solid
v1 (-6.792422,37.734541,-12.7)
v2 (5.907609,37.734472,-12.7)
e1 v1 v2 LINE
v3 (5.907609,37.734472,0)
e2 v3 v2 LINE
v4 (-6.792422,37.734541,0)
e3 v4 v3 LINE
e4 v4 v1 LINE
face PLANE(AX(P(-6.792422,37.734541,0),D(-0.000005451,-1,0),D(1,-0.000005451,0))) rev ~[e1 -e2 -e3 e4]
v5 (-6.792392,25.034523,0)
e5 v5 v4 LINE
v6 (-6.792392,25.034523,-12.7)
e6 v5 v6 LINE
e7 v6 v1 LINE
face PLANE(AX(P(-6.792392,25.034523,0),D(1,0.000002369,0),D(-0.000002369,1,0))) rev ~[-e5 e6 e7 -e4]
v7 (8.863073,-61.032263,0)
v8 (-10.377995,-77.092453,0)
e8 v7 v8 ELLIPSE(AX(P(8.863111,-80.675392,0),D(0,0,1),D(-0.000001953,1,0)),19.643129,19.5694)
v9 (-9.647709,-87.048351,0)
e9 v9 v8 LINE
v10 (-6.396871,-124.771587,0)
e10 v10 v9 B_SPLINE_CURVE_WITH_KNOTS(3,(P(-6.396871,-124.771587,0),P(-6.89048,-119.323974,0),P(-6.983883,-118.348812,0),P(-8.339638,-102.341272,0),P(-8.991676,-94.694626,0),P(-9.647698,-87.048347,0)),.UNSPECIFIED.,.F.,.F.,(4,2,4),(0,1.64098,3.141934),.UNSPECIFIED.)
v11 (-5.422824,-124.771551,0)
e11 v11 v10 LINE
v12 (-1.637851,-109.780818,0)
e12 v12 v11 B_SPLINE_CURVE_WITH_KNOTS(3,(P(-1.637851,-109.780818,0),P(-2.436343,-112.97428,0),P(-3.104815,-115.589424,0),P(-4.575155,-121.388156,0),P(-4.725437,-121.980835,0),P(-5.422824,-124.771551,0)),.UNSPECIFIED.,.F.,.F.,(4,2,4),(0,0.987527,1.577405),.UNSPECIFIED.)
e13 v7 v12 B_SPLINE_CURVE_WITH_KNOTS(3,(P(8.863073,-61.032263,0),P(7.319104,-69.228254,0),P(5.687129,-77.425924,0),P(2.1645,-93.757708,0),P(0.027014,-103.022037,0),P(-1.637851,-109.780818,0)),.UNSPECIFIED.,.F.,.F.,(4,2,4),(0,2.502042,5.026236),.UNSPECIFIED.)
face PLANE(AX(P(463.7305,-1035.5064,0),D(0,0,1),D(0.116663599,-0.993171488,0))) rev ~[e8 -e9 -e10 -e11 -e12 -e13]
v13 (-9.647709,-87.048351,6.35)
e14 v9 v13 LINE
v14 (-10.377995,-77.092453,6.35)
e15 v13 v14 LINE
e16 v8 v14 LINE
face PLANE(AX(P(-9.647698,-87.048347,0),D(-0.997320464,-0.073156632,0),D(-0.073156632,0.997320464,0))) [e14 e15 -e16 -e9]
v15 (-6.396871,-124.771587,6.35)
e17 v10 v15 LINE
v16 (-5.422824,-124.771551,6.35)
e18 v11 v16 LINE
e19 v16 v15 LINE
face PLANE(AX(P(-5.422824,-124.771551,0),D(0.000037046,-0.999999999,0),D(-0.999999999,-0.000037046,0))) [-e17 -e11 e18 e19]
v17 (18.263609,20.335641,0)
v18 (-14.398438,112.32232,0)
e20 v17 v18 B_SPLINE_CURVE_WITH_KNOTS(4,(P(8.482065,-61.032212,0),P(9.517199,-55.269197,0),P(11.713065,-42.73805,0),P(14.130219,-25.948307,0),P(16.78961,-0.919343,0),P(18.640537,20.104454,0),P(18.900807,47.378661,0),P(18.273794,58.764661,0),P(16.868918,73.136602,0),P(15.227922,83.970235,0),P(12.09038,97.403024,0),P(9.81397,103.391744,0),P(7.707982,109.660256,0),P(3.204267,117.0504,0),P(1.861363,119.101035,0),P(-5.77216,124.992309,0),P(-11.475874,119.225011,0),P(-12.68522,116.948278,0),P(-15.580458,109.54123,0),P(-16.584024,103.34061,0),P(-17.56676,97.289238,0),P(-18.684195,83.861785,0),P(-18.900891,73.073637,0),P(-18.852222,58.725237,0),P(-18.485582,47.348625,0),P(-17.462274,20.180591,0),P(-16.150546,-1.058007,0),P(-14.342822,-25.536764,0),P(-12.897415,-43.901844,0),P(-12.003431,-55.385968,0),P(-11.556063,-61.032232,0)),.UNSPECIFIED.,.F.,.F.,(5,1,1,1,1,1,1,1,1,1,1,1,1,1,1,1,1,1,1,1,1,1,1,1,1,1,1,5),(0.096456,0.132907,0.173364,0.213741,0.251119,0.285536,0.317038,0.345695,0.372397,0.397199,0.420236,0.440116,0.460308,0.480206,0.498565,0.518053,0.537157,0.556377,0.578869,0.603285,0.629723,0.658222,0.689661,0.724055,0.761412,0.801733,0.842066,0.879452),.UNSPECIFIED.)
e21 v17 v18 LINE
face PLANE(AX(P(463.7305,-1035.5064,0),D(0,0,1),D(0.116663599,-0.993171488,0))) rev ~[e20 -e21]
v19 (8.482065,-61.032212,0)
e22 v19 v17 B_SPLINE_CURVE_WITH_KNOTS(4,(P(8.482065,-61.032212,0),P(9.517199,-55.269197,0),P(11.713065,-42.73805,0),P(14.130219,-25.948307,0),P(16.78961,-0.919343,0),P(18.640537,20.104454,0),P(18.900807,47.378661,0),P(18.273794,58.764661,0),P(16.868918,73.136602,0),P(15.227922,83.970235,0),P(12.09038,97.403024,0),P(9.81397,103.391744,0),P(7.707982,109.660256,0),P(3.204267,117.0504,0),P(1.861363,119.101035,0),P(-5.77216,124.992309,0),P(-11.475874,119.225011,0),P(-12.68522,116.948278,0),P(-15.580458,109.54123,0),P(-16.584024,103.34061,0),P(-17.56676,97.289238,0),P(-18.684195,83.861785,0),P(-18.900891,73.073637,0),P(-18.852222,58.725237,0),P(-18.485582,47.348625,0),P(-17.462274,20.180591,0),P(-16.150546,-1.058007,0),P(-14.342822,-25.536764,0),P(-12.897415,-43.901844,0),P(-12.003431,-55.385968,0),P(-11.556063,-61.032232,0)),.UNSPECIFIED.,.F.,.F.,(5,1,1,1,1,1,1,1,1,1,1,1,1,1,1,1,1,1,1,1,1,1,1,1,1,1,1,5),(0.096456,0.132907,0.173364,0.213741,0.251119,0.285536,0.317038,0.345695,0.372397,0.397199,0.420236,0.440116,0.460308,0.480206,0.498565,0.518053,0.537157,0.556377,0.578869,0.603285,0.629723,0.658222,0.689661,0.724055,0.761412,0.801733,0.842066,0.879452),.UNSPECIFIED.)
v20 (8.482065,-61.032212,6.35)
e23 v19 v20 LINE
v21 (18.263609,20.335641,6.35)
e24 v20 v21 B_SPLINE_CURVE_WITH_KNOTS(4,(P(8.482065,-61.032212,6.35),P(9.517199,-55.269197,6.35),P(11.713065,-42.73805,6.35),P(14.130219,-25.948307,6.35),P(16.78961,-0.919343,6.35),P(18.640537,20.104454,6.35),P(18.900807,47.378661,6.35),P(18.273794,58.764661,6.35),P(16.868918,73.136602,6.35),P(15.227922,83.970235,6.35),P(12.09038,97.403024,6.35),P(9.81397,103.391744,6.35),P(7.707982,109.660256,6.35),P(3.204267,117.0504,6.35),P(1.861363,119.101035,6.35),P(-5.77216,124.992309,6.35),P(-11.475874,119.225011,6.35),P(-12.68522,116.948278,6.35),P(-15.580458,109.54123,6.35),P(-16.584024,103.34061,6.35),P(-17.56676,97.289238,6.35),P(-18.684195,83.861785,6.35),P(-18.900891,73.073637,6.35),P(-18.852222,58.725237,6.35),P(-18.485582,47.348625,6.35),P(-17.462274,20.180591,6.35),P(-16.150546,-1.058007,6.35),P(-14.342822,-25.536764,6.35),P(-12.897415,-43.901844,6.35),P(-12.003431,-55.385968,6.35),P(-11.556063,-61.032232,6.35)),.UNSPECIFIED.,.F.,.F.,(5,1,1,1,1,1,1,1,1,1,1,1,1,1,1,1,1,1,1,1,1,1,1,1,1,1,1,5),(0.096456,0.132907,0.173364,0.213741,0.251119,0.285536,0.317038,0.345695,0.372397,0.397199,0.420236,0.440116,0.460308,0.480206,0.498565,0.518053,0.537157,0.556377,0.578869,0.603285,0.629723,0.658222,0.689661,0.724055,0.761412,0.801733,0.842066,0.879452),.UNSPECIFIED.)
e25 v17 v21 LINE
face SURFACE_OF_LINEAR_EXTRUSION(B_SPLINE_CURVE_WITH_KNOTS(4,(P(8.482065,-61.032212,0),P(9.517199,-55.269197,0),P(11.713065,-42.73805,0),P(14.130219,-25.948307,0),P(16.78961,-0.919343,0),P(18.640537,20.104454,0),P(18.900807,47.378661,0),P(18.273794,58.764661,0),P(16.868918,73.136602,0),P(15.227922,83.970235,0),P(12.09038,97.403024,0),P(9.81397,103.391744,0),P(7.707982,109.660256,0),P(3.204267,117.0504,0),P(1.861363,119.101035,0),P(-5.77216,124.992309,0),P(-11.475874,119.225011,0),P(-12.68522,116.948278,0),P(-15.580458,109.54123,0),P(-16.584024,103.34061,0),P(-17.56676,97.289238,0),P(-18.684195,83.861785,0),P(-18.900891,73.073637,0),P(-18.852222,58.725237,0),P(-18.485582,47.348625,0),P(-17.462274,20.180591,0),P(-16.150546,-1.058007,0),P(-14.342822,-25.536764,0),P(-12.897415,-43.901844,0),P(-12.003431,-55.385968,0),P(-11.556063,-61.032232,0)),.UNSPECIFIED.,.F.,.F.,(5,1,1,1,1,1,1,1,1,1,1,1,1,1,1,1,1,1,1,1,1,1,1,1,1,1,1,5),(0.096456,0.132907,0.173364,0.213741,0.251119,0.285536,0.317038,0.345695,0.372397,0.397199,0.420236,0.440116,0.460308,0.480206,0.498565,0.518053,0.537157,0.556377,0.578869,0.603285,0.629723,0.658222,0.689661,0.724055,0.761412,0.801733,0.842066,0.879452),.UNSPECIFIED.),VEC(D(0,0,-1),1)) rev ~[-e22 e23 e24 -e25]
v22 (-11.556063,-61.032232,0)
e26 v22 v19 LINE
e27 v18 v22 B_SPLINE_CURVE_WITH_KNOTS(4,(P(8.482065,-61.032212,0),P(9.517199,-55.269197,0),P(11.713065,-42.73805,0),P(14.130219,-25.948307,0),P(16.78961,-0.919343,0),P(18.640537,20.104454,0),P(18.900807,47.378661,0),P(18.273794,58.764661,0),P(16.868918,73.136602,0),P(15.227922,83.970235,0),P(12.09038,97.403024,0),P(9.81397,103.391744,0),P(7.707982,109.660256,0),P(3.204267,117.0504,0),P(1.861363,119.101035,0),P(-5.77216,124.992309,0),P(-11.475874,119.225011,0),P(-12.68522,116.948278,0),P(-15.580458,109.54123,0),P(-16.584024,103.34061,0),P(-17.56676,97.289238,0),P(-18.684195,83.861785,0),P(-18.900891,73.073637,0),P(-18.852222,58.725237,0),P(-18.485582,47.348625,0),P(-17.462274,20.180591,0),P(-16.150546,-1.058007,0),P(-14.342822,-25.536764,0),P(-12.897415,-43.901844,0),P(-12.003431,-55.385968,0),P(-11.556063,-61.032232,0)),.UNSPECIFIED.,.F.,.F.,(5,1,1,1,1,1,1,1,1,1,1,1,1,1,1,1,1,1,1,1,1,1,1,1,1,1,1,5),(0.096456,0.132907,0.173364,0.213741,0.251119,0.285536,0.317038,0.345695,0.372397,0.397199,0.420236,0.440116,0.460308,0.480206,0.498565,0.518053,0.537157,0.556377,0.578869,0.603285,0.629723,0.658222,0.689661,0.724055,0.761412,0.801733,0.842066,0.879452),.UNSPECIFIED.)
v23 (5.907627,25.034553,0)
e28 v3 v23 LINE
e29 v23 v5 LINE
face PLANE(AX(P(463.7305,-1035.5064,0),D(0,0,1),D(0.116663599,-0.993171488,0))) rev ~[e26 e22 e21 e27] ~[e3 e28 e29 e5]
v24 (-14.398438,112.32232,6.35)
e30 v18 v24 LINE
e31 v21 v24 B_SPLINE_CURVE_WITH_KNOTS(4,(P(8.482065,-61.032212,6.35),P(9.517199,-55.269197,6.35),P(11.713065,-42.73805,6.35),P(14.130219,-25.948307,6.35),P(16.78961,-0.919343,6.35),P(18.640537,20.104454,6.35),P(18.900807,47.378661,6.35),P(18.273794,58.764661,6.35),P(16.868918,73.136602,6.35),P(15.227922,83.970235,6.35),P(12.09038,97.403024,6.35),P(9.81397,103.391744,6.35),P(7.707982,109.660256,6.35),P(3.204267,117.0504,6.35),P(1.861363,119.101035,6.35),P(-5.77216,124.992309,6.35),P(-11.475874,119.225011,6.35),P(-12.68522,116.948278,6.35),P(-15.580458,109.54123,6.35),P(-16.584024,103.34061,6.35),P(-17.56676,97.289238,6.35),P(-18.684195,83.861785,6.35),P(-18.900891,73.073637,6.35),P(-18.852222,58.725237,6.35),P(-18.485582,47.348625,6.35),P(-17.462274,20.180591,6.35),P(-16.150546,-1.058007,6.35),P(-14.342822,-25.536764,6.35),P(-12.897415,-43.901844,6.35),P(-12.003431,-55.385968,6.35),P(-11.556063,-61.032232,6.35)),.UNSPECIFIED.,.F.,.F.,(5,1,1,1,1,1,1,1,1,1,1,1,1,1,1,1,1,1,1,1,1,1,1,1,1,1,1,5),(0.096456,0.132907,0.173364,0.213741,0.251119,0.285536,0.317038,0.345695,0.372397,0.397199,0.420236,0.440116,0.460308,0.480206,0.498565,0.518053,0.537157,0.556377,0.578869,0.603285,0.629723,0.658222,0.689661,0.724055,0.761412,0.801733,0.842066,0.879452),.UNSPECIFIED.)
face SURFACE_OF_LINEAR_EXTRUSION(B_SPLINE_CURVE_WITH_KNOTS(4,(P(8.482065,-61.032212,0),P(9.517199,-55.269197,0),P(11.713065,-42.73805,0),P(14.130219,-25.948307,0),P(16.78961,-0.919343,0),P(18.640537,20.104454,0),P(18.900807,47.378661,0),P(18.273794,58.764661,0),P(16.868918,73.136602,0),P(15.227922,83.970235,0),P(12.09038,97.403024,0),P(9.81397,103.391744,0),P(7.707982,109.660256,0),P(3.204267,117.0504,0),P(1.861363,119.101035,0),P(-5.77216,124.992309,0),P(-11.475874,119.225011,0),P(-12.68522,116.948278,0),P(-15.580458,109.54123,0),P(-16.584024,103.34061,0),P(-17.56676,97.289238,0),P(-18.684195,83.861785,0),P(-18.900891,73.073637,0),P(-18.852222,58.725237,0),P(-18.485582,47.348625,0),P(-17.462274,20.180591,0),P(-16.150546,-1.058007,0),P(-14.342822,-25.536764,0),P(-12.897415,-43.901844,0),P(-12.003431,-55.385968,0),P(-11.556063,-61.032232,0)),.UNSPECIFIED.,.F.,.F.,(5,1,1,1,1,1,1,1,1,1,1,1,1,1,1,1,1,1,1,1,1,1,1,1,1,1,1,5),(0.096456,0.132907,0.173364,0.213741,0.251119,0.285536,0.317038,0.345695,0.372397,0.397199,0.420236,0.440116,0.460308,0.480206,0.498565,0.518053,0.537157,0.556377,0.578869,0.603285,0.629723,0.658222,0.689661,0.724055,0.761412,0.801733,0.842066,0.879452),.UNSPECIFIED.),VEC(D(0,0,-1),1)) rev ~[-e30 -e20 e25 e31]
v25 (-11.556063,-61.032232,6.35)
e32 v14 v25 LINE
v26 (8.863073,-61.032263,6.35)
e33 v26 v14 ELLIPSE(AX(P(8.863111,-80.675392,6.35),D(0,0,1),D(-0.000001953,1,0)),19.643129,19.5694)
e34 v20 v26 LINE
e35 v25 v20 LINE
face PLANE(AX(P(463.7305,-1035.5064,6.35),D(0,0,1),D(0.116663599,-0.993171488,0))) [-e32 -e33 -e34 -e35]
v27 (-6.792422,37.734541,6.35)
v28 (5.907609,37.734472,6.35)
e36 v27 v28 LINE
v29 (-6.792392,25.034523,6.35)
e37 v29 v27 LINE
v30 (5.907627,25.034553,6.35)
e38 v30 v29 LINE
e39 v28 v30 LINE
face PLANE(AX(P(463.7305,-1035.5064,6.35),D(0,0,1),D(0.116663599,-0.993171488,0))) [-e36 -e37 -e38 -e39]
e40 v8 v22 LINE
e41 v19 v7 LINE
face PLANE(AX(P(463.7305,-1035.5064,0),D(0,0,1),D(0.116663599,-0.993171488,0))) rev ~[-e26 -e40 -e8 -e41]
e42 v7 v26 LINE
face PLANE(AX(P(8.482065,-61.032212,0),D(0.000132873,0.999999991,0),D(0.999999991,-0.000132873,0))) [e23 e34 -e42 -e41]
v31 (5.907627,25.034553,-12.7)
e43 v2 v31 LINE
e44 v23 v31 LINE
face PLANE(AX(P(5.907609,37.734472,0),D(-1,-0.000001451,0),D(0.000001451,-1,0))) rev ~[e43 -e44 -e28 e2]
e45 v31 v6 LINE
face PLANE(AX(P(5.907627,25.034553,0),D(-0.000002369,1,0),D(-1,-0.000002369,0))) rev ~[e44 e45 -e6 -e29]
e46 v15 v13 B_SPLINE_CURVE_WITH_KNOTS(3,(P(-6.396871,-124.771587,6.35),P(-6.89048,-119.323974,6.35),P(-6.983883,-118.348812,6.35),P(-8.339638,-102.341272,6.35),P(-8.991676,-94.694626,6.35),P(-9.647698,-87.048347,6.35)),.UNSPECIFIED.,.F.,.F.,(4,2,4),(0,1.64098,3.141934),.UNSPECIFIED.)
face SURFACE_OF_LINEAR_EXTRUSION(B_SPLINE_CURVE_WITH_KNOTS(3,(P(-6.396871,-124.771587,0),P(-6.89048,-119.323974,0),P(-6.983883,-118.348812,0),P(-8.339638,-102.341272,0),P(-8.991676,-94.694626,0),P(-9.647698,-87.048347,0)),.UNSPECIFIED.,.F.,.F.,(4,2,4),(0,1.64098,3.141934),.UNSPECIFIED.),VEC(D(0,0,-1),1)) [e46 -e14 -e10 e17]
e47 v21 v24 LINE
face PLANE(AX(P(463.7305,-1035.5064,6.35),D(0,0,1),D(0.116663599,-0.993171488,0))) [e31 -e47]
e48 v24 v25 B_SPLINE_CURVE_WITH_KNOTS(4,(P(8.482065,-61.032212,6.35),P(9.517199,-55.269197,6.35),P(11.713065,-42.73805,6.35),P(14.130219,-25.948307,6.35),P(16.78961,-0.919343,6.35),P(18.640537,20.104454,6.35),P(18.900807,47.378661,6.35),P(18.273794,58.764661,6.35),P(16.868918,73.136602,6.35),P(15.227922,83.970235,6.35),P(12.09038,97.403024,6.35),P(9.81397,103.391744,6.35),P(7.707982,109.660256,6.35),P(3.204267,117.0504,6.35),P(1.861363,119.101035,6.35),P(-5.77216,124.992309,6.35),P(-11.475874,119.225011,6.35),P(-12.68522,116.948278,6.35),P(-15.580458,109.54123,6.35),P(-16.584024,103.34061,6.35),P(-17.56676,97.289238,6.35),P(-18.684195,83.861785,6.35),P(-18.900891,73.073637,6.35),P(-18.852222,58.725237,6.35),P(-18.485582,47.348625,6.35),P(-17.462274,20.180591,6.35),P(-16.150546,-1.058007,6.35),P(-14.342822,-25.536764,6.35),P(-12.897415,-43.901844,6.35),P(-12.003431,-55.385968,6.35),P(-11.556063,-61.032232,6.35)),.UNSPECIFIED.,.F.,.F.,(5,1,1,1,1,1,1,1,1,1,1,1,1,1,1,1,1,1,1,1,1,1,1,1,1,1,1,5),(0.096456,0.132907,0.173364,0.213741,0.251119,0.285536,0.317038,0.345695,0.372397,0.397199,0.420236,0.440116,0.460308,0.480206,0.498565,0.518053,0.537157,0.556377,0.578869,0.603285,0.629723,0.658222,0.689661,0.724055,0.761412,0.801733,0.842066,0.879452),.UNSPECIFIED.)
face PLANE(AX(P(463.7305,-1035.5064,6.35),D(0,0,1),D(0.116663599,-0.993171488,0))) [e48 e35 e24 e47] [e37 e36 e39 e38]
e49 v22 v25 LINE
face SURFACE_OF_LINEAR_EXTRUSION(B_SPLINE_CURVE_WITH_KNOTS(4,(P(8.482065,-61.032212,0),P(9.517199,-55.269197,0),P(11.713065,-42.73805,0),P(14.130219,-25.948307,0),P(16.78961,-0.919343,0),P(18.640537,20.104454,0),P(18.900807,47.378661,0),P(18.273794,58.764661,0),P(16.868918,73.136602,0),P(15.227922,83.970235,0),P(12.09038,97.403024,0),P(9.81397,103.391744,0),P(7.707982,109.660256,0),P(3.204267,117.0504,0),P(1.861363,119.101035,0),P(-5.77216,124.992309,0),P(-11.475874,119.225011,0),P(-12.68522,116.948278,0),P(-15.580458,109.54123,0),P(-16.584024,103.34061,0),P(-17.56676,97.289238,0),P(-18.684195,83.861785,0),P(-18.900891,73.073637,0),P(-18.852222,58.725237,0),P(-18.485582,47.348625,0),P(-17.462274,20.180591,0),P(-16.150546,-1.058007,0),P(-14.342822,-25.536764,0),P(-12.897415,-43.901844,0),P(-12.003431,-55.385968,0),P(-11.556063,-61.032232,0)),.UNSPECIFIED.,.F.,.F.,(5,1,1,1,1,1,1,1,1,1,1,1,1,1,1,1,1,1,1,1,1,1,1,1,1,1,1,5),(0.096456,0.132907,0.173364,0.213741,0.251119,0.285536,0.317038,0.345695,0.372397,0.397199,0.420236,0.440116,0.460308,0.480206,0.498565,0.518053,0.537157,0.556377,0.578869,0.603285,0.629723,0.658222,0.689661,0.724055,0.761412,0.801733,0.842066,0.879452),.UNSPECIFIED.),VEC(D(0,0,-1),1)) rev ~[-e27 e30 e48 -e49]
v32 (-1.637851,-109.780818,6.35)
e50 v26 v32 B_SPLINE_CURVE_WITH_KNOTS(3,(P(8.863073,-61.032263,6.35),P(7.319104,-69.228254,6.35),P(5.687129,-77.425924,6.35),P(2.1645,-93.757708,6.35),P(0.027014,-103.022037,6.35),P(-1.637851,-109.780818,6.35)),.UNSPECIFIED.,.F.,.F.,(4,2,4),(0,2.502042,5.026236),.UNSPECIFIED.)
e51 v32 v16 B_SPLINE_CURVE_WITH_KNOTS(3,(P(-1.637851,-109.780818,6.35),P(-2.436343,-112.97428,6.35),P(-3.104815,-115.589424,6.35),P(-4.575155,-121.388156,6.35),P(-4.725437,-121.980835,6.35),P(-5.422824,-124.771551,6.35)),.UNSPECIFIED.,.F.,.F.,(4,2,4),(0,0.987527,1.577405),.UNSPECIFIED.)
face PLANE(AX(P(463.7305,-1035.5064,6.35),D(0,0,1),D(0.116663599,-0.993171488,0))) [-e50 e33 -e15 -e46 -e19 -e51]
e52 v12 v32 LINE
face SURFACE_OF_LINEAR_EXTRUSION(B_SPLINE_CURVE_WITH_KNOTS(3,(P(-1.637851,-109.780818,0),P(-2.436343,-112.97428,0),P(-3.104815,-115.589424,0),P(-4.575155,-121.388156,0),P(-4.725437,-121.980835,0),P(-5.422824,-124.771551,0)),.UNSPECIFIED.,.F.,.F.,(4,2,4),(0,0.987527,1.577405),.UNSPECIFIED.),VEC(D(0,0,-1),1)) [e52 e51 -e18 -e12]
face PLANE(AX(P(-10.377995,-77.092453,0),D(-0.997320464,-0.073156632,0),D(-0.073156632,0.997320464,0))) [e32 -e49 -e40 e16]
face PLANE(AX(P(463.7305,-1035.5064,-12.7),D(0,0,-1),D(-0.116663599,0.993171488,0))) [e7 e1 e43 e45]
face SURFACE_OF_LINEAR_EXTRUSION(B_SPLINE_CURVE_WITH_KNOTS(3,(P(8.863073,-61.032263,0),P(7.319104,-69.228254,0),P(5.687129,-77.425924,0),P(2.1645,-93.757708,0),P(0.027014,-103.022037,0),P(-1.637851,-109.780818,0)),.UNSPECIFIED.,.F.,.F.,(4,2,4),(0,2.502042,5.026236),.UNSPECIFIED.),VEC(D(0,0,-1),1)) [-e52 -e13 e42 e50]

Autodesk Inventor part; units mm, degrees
ref_plane "YZ Plane" through (0, 0, 0) normal (1, 0, 0) x (0, 1, 0)
ref_plane "XZ Plane" through (0, 0, 0) normal (0, 1, 0) x (-1, 0, 0)
ref_plane "XY Plane" through (0, 0, 0) normal (0, 0, 1) x (1, 0, 0)
ref_plane "Work Plane1" through (463.7305, -1035.5064, 0) normal (0, 0, 1) x (0.1166636, -0.9931715, 0)
sketch "Sketch1" plane through (463.7305, -1035.5064, 0) normal (0, 0, 1) x (0.1166636, -0.9931715, 0)
  line L0 (-1119.3235, -329.4885) -> (-1106.7103, -330.9701) projected
  line L1 (-1106.7103, -330.9701) -> (-1108.1919, -343.5834) projected
  line L2 (-1108.1919, -343.5834) -> (-1120.8052, -342.1018) projected
  line L3 (-1120.8052, -342.1018) -> (-1119.3235, -329.4885) projected
  line L4 (-1023.2686, -358.3554) -> (-1020.9309, -338.4541) projected
  spline S0 degree 4 poles (-1020.9309, -338.4541) (-1026.5338, -336.7537) (-1038.7232, -333.1109) (-1055.1163, -328.7515) (-1079.6641, -323.1903) (-1100.3284, -318.8993) (-1127.386, -315.4589) (-1138.7674, -314.7533) (-1153.2051, -314.4719) (-1164.1562, -314.8378) (-1177.8633, -316.3868) (-1184.0767, -317.949) (-1190.5481, -319.3093) (-1198.4132, -322.9201) (-1200.6065, -324.0146) (-1207.3481, -330.9087) (-1202.2856, -337.2463) (-1200.1655, -338.713) (-1193.1468, -342.4526) (-1187.1056, -344.1727) (-1181.2102, -345.8547) (-1168.0048, -348.531) (-1157.3156, -350.0048) (-1143.0595, -351.6304) (-1131.7178, -352.5935) (-1104.6159, -354.7467) (-1083.3693, -355.9217) (-1058.8468, -356.9821) (-1040.4385, -357.6891) (-1028.9285, -358.141) (-1023.2686, -358.3554) knots 0.096456 0.096456 0.096456 0.096456 0.096456 0.132907 0.173364 0.213741 0.251119 0.285536 0.317038 0.345695 0.372397 0.397199 0.420236 0.440116 0.460308 0.480206 0.498565 0.518053 0.537157 0.556377 0.578869 0.603285 0.629723 0.658222 0.689661 0.724055 0.761412 0.801733 0.842066 0.879452 0.879452 0.879452 0.879452 0.879452 projected
  line L5 (-1020.9309, -338.4541) -> (-1074.8444, -347.7607)
  line L6 (-11.0175, -70.7186) -> (-1195.771, -340.9542)
  line L7 (-959.249, -359.7001) -> (-959.3626, -360.6675) projected
  spline S1 degree 3 poles (-973.6958, -354.1921) (-970.6173, -355.3577) (-968.098, -356.3267) (-962.5104, -358.4635) (-961.9393, -358.6819) (-959.249, -359.7001) knots 0 0 0 0 0.987527 0.987527 1.577405 1.577405 1.577405 1.577405 projected
  spline S2 degree 3 poles (-1020.8864, -338.0757) (-1012.9265, -340.5653) (-1004.9752, -343.1425) (-989.1659, -348.5464) (-980.2142, -351.7501) (-973.6958, -354.1921) knots 0 0 0 0 2.502042 2.502042 5.026236 5.026236 5.026236 5.026236 projected
  ellipse E0 centre (-1001.3774, -340.3673) end of major axis (-1020.8864, -338.0757) minor radius 19.5694 (-1020.8864, -338.0757) -> (-997.2075, -359.4952) ccw projected
  spline S3 degree 3 poles (-959.3626, -360.6675) (-964.8306, -360.5222) (-965.81, -360.5012) (-981.8664, -359.9802) (-989.5369, -359.7357) (-997.2075, -359.4952) knots 0 0 0 0 1.64098 1.64098 3.141934 3.141934 3.141934 3.141934 projected
  line L8 (-1119.3235, -329.4885) -> (-1106.7103, -330.9701) projected
  line L9 (-1106.7103, -330.9701) -> (-1108.1919, -343.5834) projected
  line L10 (-1108.1919, -343.5834) -> (-1120.8052, -342.1018) projected
  line L11 (-1120.8052, -342.1018) -> (-1119.3235, -329.4885) projected
  line L12 (-1023.2686, -358.3554) -> (-1020.9309, -338.4541) projected
  spline S4 degree 4 poles (-1020.9309, -338.4541) (-1026.5338, -336.7537) (-1038.7232, -333.1109) (-1055.1163, -328.7515) (-1079.6641, -323.1903) (-1100.3284, -318.8993) (-1127.386, -315.4589) (-1138.7674, -314.7533) (-1153.2051, -314.4719) (-1164.1562, -314.8378) (-1177.8633, -316.3868) (-1184.0767, -317.949) (-1190.5481, -319.3093) (-1198.4132, -322.9201) (-1200.6065, -324.0146) (-1207.3481, -330.9087) (-1202.2856, -337.2463) (-1200.1655, -338.713) (-1193.1468, -342.4526) (-1187.1056, -344.1727) (-1181.2102, -345.8547) (-1168.0048, -348.531) (-1157.3156, -350.0048) (-1143.0595, -351.6304) (-1131.7178, -352.5935) (-1104.6159, -354.7467) (-1083.3693, -355.9217) (-1058.8468, -356.9821) (-1040.4385, -357.6891) (-1028.9285, -358.141) (-1023.2686, -358.3554) knots 0.096456 0.096456 0.096456 0.096456 0.096456 0.132907 0.173364 0.213741 0.251119 0.285536 0.317038 0.345695 0.372397 0.397199 0.420236 0.440116 0.460308 0.480206 0.498565 0.518053 0.537157 0.556377 0.578869 0.603285 0.629723 0.658222 0.689661 0.724055 0.761412 0.801733 0.842066 0.879452 0.879452 0.879452 0.879452 0.879452 projected
  line L13 (-959.249, -359.7001) -> (-959.3626, -360.6675) projected
  spline S5 degree 3 poles (-973.6958, -354.1921) (-970.6173, -355.3577) (-968.098, -356.3267) (-962.5104, -358.4635) (-961.9393, -358.6819) (-959.249, -359.7001) knots 0 0 0 0 0.987527 0.987527 1.577405 1.577405 1.577405 1.577405 projected
  spline S6 degree 3 poles (-1020.8864, -338.0757) (-1012.9265, -340.5653) (-1004.9752, -343.1425) (-989.1659, -348.5464) (-980.2142, -351.7501) (-973.6958, -354.1921) knots 0 0 0 0 2.502042 2.502042 5.026236 5.026236 5.026236 5.026236 projected
  ellipse E1 centre (-1001.3774, -340.3673) end of major axis (-1020.8864, -338.0757) minor radius 19.5694 (-1020.8864, -338.0757) -> (-997.2075, -359.4952) ccw projected
  spline S7 degree 3 poles (-959.3626, -360.6675) (-964.8306, -360.5222) (-965.81, -360.5012) (-981.8664, -359.9802) (-989.5369, -359.7357) (-997.2075, -359.4952) knots 0 0 0 0 1.64098 1.64098 3.141934 3.141934 3.141934 3.141934 projected
  line L14 (-1020.9309, -338.4541) -> (-1020.8864, -338.0757)
  line L15 (-997.2075, -359.4952) -> (-1023.2686, -358.3554)
  point P0 (-1082.5359, -339.758)
extrude "Extrusion1" add sketch "Sketch1" along normal blind 6.35 contours S0 L6 L4 | L4 L14 E0 L15 | S0 L6 | E0 S2 S1 L7 S3 L15
sketch "Sketch2" plane through (463.7305, -1035.5064, 0) normal (0, 0, -1) x (-0.1166636, 0.9931715, 0)
  line L0 (1106.7103, -330.9701) -> (1108.1919, -343.5834) projected
  line L1 (1119.3235, -329.4885) -> (1106.7103, -330.9701) projected
  line L2 (1120.8052, -342.1018) -> (1119.3235, -329.4885) projected
  line L3 (1108.1919, -343.5834) -> (1120.8052, -342.1018) projected
  ellipse E0 centre (4.857, -80.0159) end of major axis (4.8635, -79.0121) minor radius 1 projected
  line L4 (1119.3235, -329.4885) -> (1106.7103, -330.9701) projected
  line L5 (1106.7103, -330.9701) -> (1108.1919, -343.5834) projected
  line L6 (1108.1919, -343.5834) -> (1120.8052, -342.1018) projected
  line L7 (1120.8052, -342.1018) -> (1119.3235, -329.4885) projected
  line L8 (959.3626, -360.6675) -> (959.249, -359.7001) projected
  line L9 (1020.8864, -338.0757) -> (1020.9309, -338.4541) projected
  line L10 (1023.2686, -358.3554) -> (997.2075, -359.4952) projected
  point P0 (1082.5359, -339.758)
extrude "Extrusion2" add sketch "Sketch2" along normal blind 12.7 contours L1 L2 L3 L0
sketch "Sketch3" plane through (463.7305, -1035.5064, 0) normal (0, 0, 1) x (0.1166636, -0.9931715, 0)
  line L0 (-1106.7103, -330.9701) -> (-1108.1919, -343.5834) projected
  line L1 (-1119.3235, -329.4885) -> (-1106.7103, -330.9701) projected
  line L2 (-1120.8052, -342.1018) -> (-1119.3235, -329.4885) projected
  line L3 (-1108.1919, -343.5834) -> (-1120.8052, -342.1018) projected
  point P0 (-1082.5359, -339.758)
extrude "Extrusion3" add sketch "Sketch3" along normal up to surface (6.35 mm away)
properties part number "WingCap"
